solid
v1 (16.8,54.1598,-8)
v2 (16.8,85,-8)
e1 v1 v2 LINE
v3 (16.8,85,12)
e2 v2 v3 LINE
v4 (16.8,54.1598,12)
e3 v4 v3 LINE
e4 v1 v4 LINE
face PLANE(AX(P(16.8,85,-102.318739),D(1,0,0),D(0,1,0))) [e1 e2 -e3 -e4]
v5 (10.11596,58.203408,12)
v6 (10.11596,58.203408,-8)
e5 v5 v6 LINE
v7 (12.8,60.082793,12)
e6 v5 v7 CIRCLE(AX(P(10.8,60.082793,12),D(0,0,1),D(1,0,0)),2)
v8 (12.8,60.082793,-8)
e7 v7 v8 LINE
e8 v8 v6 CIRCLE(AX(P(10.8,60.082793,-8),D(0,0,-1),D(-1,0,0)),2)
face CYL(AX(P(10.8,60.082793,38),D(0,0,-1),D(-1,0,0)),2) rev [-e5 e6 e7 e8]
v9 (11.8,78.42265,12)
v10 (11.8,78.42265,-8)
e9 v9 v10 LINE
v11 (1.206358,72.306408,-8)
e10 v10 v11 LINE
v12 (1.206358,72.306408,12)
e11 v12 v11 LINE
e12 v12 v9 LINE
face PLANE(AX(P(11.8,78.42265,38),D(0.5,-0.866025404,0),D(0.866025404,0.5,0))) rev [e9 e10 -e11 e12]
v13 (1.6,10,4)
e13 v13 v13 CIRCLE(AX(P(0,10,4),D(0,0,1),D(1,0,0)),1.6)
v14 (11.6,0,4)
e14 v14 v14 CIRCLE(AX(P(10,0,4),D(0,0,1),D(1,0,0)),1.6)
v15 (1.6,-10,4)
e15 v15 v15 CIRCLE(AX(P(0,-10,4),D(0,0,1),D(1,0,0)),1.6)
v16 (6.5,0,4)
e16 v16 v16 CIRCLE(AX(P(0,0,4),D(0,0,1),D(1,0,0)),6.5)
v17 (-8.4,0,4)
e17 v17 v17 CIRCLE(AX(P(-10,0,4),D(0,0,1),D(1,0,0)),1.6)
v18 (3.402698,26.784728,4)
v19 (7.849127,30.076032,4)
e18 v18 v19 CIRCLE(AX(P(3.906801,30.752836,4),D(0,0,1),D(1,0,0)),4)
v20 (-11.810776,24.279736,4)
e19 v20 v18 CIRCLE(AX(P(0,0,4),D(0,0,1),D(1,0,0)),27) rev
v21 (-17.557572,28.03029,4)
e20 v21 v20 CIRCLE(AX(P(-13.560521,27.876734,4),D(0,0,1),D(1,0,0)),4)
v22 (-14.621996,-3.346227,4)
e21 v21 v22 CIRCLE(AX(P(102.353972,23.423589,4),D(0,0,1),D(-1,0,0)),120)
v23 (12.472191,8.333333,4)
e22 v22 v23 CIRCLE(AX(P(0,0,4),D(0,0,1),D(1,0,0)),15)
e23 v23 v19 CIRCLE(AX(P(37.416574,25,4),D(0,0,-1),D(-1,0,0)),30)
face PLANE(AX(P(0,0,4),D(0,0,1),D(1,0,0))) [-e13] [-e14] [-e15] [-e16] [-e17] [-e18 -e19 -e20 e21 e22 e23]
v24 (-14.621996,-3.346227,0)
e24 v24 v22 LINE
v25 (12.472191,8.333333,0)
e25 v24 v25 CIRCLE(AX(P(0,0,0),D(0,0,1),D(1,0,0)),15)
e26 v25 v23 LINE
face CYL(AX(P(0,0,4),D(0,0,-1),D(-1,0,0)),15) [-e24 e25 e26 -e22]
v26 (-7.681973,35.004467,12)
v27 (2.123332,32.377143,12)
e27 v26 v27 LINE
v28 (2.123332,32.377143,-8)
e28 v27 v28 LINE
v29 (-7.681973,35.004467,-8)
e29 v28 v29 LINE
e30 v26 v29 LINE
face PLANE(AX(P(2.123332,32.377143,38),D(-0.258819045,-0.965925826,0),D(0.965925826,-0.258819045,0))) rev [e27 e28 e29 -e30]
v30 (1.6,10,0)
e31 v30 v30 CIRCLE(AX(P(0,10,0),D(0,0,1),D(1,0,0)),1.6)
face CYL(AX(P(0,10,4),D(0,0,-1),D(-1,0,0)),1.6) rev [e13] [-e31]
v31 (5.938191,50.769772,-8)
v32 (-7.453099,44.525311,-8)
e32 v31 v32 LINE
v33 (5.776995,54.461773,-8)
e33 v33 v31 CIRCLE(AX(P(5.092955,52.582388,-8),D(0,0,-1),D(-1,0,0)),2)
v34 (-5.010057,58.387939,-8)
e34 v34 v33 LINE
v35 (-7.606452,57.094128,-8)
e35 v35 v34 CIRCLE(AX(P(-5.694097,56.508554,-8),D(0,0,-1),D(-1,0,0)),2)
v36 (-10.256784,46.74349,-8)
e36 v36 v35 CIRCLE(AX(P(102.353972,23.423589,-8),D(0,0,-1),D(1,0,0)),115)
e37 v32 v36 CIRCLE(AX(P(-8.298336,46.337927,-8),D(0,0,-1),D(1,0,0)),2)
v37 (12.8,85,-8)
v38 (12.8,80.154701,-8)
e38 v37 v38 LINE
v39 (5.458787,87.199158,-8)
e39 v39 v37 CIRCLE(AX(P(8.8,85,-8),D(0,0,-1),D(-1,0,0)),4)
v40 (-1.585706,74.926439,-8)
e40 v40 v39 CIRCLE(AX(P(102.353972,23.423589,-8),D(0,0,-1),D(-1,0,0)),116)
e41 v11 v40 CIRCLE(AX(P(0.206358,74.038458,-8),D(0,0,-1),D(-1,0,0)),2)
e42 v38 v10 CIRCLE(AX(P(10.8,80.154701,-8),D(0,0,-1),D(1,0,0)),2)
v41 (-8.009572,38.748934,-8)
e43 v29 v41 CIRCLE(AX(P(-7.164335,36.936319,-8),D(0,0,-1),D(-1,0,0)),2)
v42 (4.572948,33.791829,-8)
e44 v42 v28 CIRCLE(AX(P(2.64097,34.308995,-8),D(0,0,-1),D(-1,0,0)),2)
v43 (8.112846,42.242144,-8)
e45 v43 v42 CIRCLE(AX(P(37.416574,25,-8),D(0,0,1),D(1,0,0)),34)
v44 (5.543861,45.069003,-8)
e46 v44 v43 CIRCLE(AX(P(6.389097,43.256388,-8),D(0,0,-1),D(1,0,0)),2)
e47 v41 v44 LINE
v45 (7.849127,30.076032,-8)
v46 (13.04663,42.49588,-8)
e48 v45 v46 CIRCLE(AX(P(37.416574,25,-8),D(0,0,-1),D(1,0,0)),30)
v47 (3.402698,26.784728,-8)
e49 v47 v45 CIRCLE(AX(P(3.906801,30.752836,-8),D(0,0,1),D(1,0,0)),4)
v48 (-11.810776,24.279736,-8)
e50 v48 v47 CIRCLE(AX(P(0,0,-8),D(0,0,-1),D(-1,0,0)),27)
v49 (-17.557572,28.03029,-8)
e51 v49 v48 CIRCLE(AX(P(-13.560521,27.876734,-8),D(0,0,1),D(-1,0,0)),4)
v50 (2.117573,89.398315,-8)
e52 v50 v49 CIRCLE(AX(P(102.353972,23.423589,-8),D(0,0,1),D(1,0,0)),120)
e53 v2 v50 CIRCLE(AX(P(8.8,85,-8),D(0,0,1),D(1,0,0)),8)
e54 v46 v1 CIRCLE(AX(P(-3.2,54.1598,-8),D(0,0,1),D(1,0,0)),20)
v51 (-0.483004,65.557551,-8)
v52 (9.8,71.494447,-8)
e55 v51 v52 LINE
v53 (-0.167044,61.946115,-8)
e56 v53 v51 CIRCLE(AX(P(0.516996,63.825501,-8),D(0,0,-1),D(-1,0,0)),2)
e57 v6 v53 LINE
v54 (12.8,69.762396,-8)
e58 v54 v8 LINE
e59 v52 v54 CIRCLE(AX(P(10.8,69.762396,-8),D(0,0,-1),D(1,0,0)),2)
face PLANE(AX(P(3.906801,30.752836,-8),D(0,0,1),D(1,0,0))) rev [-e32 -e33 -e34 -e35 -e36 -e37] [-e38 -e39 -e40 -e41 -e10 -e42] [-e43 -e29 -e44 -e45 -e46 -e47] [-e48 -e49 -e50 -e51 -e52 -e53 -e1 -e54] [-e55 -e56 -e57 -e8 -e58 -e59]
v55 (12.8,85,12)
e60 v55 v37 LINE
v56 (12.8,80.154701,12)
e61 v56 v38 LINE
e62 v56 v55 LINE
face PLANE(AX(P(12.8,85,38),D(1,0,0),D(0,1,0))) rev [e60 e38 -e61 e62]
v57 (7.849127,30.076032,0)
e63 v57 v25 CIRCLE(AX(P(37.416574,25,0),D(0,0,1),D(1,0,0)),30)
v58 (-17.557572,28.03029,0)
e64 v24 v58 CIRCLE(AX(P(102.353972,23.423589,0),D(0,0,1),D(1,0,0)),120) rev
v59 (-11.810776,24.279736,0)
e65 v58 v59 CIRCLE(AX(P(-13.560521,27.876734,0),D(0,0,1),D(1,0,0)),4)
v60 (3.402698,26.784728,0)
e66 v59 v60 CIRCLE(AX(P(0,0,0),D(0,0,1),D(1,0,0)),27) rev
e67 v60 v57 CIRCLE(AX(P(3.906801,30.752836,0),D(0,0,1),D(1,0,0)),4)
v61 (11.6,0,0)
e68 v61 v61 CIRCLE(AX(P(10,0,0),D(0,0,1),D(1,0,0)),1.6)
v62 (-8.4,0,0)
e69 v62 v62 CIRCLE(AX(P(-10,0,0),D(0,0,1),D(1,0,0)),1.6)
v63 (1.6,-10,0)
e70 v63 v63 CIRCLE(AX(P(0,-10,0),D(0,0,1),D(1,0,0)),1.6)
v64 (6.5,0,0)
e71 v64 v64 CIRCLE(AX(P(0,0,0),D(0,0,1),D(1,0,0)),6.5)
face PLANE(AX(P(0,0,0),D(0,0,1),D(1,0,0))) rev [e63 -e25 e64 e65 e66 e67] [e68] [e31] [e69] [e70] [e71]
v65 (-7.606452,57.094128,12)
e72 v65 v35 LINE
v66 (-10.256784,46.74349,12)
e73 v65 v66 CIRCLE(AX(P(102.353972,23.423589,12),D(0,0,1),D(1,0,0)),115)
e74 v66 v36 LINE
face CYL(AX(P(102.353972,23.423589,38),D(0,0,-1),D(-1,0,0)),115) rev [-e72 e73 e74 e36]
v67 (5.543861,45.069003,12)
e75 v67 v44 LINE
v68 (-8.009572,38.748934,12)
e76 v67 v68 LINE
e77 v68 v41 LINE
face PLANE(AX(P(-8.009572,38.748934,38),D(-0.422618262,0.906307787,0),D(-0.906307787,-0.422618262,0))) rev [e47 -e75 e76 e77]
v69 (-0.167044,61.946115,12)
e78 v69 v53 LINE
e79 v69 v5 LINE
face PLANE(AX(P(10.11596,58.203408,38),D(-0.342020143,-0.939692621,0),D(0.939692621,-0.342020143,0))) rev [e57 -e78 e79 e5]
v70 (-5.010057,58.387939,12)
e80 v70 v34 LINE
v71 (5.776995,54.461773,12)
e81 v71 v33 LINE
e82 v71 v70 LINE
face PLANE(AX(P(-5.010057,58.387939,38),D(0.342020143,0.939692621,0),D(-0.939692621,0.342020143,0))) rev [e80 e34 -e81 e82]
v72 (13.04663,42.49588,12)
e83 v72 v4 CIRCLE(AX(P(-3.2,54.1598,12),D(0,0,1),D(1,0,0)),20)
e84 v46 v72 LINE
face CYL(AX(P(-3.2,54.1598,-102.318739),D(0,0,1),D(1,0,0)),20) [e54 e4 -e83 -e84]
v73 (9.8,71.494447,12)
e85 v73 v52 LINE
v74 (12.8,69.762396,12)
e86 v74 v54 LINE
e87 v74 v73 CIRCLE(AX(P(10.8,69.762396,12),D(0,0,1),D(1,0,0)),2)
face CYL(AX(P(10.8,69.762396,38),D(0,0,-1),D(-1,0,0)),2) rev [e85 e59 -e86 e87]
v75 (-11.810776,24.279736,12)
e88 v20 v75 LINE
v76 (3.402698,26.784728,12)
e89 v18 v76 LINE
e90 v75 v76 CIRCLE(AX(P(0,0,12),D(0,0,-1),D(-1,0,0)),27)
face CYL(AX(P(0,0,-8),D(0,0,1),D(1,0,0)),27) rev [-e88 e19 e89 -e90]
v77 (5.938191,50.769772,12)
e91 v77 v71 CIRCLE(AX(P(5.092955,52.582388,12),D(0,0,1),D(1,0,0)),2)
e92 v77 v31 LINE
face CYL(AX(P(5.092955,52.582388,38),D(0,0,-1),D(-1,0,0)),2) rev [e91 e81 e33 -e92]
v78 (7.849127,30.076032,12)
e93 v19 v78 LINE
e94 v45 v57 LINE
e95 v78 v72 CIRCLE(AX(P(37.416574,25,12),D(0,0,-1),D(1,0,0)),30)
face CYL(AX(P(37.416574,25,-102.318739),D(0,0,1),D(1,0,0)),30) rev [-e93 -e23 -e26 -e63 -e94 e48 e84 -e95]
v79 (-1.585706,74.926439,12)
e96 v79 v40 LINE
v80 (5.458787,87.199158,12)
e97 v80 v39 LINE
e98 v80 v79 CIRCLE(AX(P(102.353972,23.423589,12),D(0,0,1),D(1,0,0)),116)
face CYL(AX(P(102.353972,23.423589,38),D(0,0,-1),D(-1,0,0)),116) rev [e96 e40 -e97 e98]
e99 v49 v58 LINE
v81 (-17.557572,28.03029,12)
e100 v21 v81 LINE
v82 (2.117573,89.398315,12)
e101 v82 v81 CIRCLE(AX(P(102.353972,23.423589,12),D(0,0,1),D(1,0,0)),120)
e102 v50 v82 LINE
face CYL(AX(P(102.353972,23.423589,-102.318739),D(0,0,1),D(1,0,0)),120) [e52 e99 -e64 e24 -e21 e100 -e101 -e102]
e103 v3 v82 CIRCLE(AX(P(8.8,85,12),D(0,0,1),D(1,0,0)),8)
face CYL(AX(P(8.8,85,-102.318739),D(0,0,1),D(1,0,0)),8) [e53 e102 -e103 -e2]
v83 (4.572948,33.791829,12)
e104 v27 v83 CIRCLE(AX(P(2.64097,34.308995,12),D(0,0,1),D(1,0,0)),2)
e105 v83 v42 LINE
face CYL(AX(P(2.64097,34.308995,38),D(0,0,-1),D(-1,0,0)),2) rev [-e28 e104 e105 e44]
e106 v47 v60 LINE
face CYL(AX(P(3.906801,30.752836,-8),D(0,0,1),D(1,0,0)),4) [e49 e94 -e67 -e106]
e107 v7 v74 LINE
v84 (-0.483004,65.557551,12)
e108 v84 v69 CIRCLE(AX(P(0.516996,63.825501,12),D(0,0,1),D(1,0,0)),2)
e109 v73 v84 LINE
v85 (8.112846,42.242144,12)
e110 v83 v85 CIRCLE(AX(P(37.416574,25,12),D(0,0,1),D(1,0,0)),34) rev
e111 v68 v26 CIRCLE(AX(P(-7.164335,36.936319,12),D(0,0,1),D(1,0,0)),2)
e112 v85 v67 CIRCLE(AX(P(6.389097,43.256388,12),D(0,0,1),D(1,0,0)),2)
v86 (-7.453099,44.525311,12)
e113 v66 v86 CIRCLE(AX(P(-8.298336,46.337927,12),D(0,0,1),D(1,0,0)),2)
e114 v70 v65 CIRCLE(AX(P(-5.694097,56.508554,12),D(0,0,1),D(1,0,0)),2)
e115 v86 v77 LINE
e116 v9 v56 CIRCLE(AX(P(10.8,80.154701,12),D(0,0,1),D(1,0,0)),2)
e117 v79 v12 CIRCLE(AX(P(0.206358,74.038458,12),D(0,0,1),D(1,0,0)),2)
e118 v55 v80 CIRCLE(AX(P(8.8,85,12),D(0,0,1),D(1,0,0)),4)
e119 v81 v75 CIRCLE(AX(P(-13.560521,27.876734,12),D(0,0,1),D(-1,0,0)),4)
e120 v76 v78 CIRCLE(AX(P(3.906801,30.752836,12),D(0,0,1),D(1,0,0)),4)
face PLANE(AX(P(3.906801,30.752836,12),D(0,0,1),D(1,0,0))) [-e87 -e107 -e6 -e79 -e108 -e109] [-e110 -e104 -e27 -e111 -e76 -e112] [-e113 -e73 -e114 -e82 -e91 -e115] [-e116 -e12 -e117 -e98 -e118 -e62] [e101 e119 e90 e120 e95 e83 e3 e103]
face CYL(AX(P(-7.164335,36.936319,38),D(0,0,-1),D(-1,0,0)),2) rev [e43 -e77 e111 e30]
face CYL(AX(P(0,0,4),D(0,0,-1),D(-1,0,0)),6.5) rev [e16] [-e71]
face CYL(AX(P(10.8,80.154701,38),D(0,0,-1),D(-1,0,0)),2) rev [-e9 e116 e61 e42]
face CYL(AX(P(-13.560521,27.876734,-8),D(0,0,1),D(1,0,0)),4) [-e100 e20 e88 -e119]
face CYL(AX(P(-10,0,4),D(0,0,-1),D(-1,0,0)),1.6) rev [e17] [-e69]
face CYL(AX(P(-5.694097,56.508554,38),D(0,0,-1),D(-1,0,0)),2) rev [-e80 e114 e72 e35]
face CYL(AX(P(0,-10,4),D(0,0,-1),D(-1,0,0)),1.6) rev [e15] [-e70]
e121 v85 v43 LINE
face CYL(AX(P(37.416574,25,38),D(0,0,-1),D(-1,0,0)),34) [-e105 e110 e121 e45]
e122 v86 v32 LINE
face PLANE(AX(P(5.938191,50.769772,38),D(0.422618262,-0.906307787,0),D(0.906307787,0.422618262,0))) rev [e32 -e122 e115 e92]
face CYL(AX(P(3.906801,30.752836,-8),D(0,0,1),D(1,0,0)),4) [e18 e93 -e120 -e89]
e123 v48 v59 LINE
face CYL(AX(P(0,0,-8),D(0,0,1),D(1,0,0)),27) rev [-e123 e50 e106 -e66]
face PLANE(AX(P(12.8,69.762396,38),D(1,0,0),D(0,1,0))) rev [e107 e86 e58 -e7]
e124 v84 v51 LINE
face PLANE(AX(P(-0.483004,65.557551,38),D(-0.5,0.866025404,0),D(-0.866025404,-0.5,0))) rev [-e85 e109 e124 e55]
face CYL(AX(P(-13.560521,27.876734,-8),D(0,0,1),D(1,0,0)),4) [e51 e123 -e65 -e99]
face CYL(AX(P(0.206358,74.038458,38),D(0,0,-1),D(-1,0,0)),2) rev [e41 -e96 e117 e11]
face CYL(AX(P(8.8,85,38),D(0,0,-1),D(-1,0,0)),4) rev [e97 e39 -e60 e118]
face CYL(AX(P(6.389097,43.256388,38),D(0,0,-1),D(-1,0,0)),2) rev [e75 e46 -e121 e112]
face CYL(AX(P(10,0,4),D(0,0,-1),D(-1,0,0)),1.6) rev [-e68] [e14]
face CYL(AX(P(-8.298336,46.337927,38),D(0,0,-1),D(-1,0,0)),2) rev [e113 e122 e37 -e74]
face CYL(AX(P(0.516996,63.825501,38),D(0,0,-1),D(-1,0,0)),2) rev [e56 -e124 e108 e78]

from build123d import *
from build123d.topology import SkipClean

# Parameters (mm, degrees)
SKETCH_1_R           = 15
SKETCH_1_R_2         = 6.5
SKETCH_1_R_3         = 1.6
EXTRUDE_1_DEPTH      = 4
EXTRUDE_START        = -4
EXTRUDE_3_DEPTH      = 4
EXTRUDE_4_DEPTH      = 8
EXTRUDE_4_DEPTH_BACK = 12
CUT_EXTRUDE_1_DEPTH  = 46


with BuildPart() as part:
    # 草图1 → 凸台-拉伸1 (new body)
    with BuildSketch(Plane.XY):
        Circle(SKETCH_1_R)
        Circle(SKETCH_1_R_2, mode=Mode.SUBTRACT)
        with Locations((0, 10)):
            Circle(SKETCH_1_R_3, mode=Mode.SUBTRACT)
        with Locations((10, 0)):
            Circle(SKETCH_1_R_3, mode=Mode.SUBTRACT)
        with Locations((0, -10)):
            Circle(SKETCH_1_R_3, mode=Mode.SUBTRACT)
        with Locations((-10, 0)):
            Circle(SKETCH_1_R_3, mode=Mode.SUBTRACT)
    extrude(amount=EXTRUDE_1_DEPTH)

    # 草图2 → 凸台-拉伸3 (add)
    with BuildSketch(Plane.XY.offset(4).offset(EXTRUDE_START)):
        with BuildLine():
            Line((16.8, 85), (16.8, 54.159799849))
            ThreePointArc((16.8, 54.159799849), (15.83854762, 48.033324147), (13.046629547, 42.49587991))
            ThreePointArc((13.046629547, 42.49587991), (7.420814059, 25.504374344), (12.472191289, 8.333333333))
            ThreePointArc((12.472191289, 8.333333333), (-5.937882388, 13.774670695), (-14.621995932, -3.346226976))
            ThreePointArc((-14.621995932, -3.346226976), (-15.737901413, 44.738127218), (2.117573463, 89.398315084))
            ThreePointArc((2.117573463, 89.398315084), (11.095712057, 92.663530919), (16.8, 85))
        make_face()
    extrude(amount=EXTRUDE_3_DEPTH)

    # 草图3 → 凸台-拉伸4 (add, two sides: drawn at the far end of the back side and taken through both)
    with SkipClean():  # the faces are left unmerged after this step: merging them gives an invalid solid
        with BuildSketch(Plane.XY.offset(4).offset(-EXTRUDE_4_DEPTH_BACK)):
            with BuildLine():
                Line((16.8, 54.159799849), (16.8, 85))
                ThreePointArc((16.8, 85), (11.095712057, 92.663530919), (2.117573463, 89.398315084))
                ThreePointArc((2.117573463, 89.398315084), (-11.916705707, 60.059804871), (-17.55757213, 28.030290369))
                ThreePointArc((-17.55757213, 28.030290369), (-15.746673, 24.526996644), (-11.810776072, 24.27973576))
                ThreePointArc((-11.810776072, 24.27973576), (-4.386649325, 26.64127076), (3.402697603, 26.784727906))
                ThreePointArc((3.402697603, 26.784727906), (6.286614818, 27.53779516), (7.849127177, 30.076031539))
                ThreePointArc((7.849127177, 30.076031539), (9.742150736, 36.581291134), (13.046629547, 42.49587991))
                ThreePointArc((13.046629547, 42.49587991), (15.83854762, 48.033324147), (16.8, 54.159799849))
            make_face()
        extrude(amount=EXTRUDE_4_DEPTH + EXTRUDE_4_DEPTH_BACK)
    add(part.part.scale(1), mode=Mode.REPLACE)  # the faces are merged on a copy

    # 草图5 → 切除-拉伸1 (cut)
    with BuildSketch(Plane(origin=(0, 0, -8), x_dir=(-1, 0, 0), z_dir=(0, 0, -1))):
        with BuildLine():
            Line((-12.8, 69.762395693), (-12.8, 60.082793322))
            ThreePointArc((-12.8, 60.082793322), (-11.947152873, 58.444489233), (-10.115959713, 58.20340808))
            Line((-10.115959713, 58.20340808), (0.167044148, 61.946115404))
            ThreePointArc((0.167044148, 61.946115404), (1.475393257, 63.65118916), (0.483003861, 65.557551453))
            Line((0.483003861, 65.557551453), (-9.8, 71.494446501))
            ThreePointArc((-9.8, 71.494446501), (-11.8, 71.494446501), (-12.8, 69.762395693))
        make_face()
        with BuildLine():
            Line((-11.8, 78.422649731), (-1.206357847, 72.306407582))
            ThreePointArc((-1.206357847, 72.306407582), (1.162211364, 72.580028303), (1.585705551, 74.926438557))
            ThreePointArc((1.585705551, 74.926438557), (-1.749223409, 81.170317372), (-5.458786731, 87.199157542))
            ThreePointArc((-5.458786731, 87.199157542), (-9.947856029, 88.83176546), (-12.8, 85))
            Line((-12.8, 85), (-12.8, 80.154700538))
            ThreePointArc((-12.8, 80.154700538), (-12.532050808, 79.154700538), (-11.8, 78.422649731))
        make_face()
        with BuildLine():
            Line((5.01005666, 58.38793894), (-5.776995128, 54.461773174))
            ThreePointArc((-5.776995128, 54.461773174), (-7.091051284, 52.669626708), (-5.938191364, 50.769772359))
            Line((-5.938191364, 50.769772359), (7.453099332, 44.525310955))
            ThreePointArc((7.453099332, 44.525310955), (9.539258698, 44.76945259), (10.256783773, 46.743490028))
            ThreePointArc((10.256783773, 46.743490028), (9.051891671, 51.949605837), (7.60645214, 57.094128298))
            ThreePointArc((7.60645214, 57.094128298), (6.586103601, 58.298616303), (5.01005666, 58.38793894))
        make_face()
        with BuildLine():
            Line((-2.123332063, 32.377143259), (7.681973135, 35.004466868))
            ThreePointArc((7.681973135, 35.004466868), (9.156724441, 36.762007035), (8.009571568, 38.748934095))
            Line((8.009571568, 38.748934095), (-5.543860738, 45.069003373))
            ThreePointArc((-5.543860738, 45.069003373), (-7.869208523, 44.601479118), (-8.112845962, 42.242144033))
            ThreePointArc((-8.112845962, 42.242144033), (-6.056960525, 38.136767143), (-4.572948137, 33.791828527))
            ThreePointArc((-4.572948137, 33.791828527), (-3.641181599, 32.577066199), (-2.123332063, 32.377143259))
        make_face()
    extrude(amount=-CUT_EXTRUDE_1_DEPTH, mode=Mode.SUBTRACT)


solid = part.part
